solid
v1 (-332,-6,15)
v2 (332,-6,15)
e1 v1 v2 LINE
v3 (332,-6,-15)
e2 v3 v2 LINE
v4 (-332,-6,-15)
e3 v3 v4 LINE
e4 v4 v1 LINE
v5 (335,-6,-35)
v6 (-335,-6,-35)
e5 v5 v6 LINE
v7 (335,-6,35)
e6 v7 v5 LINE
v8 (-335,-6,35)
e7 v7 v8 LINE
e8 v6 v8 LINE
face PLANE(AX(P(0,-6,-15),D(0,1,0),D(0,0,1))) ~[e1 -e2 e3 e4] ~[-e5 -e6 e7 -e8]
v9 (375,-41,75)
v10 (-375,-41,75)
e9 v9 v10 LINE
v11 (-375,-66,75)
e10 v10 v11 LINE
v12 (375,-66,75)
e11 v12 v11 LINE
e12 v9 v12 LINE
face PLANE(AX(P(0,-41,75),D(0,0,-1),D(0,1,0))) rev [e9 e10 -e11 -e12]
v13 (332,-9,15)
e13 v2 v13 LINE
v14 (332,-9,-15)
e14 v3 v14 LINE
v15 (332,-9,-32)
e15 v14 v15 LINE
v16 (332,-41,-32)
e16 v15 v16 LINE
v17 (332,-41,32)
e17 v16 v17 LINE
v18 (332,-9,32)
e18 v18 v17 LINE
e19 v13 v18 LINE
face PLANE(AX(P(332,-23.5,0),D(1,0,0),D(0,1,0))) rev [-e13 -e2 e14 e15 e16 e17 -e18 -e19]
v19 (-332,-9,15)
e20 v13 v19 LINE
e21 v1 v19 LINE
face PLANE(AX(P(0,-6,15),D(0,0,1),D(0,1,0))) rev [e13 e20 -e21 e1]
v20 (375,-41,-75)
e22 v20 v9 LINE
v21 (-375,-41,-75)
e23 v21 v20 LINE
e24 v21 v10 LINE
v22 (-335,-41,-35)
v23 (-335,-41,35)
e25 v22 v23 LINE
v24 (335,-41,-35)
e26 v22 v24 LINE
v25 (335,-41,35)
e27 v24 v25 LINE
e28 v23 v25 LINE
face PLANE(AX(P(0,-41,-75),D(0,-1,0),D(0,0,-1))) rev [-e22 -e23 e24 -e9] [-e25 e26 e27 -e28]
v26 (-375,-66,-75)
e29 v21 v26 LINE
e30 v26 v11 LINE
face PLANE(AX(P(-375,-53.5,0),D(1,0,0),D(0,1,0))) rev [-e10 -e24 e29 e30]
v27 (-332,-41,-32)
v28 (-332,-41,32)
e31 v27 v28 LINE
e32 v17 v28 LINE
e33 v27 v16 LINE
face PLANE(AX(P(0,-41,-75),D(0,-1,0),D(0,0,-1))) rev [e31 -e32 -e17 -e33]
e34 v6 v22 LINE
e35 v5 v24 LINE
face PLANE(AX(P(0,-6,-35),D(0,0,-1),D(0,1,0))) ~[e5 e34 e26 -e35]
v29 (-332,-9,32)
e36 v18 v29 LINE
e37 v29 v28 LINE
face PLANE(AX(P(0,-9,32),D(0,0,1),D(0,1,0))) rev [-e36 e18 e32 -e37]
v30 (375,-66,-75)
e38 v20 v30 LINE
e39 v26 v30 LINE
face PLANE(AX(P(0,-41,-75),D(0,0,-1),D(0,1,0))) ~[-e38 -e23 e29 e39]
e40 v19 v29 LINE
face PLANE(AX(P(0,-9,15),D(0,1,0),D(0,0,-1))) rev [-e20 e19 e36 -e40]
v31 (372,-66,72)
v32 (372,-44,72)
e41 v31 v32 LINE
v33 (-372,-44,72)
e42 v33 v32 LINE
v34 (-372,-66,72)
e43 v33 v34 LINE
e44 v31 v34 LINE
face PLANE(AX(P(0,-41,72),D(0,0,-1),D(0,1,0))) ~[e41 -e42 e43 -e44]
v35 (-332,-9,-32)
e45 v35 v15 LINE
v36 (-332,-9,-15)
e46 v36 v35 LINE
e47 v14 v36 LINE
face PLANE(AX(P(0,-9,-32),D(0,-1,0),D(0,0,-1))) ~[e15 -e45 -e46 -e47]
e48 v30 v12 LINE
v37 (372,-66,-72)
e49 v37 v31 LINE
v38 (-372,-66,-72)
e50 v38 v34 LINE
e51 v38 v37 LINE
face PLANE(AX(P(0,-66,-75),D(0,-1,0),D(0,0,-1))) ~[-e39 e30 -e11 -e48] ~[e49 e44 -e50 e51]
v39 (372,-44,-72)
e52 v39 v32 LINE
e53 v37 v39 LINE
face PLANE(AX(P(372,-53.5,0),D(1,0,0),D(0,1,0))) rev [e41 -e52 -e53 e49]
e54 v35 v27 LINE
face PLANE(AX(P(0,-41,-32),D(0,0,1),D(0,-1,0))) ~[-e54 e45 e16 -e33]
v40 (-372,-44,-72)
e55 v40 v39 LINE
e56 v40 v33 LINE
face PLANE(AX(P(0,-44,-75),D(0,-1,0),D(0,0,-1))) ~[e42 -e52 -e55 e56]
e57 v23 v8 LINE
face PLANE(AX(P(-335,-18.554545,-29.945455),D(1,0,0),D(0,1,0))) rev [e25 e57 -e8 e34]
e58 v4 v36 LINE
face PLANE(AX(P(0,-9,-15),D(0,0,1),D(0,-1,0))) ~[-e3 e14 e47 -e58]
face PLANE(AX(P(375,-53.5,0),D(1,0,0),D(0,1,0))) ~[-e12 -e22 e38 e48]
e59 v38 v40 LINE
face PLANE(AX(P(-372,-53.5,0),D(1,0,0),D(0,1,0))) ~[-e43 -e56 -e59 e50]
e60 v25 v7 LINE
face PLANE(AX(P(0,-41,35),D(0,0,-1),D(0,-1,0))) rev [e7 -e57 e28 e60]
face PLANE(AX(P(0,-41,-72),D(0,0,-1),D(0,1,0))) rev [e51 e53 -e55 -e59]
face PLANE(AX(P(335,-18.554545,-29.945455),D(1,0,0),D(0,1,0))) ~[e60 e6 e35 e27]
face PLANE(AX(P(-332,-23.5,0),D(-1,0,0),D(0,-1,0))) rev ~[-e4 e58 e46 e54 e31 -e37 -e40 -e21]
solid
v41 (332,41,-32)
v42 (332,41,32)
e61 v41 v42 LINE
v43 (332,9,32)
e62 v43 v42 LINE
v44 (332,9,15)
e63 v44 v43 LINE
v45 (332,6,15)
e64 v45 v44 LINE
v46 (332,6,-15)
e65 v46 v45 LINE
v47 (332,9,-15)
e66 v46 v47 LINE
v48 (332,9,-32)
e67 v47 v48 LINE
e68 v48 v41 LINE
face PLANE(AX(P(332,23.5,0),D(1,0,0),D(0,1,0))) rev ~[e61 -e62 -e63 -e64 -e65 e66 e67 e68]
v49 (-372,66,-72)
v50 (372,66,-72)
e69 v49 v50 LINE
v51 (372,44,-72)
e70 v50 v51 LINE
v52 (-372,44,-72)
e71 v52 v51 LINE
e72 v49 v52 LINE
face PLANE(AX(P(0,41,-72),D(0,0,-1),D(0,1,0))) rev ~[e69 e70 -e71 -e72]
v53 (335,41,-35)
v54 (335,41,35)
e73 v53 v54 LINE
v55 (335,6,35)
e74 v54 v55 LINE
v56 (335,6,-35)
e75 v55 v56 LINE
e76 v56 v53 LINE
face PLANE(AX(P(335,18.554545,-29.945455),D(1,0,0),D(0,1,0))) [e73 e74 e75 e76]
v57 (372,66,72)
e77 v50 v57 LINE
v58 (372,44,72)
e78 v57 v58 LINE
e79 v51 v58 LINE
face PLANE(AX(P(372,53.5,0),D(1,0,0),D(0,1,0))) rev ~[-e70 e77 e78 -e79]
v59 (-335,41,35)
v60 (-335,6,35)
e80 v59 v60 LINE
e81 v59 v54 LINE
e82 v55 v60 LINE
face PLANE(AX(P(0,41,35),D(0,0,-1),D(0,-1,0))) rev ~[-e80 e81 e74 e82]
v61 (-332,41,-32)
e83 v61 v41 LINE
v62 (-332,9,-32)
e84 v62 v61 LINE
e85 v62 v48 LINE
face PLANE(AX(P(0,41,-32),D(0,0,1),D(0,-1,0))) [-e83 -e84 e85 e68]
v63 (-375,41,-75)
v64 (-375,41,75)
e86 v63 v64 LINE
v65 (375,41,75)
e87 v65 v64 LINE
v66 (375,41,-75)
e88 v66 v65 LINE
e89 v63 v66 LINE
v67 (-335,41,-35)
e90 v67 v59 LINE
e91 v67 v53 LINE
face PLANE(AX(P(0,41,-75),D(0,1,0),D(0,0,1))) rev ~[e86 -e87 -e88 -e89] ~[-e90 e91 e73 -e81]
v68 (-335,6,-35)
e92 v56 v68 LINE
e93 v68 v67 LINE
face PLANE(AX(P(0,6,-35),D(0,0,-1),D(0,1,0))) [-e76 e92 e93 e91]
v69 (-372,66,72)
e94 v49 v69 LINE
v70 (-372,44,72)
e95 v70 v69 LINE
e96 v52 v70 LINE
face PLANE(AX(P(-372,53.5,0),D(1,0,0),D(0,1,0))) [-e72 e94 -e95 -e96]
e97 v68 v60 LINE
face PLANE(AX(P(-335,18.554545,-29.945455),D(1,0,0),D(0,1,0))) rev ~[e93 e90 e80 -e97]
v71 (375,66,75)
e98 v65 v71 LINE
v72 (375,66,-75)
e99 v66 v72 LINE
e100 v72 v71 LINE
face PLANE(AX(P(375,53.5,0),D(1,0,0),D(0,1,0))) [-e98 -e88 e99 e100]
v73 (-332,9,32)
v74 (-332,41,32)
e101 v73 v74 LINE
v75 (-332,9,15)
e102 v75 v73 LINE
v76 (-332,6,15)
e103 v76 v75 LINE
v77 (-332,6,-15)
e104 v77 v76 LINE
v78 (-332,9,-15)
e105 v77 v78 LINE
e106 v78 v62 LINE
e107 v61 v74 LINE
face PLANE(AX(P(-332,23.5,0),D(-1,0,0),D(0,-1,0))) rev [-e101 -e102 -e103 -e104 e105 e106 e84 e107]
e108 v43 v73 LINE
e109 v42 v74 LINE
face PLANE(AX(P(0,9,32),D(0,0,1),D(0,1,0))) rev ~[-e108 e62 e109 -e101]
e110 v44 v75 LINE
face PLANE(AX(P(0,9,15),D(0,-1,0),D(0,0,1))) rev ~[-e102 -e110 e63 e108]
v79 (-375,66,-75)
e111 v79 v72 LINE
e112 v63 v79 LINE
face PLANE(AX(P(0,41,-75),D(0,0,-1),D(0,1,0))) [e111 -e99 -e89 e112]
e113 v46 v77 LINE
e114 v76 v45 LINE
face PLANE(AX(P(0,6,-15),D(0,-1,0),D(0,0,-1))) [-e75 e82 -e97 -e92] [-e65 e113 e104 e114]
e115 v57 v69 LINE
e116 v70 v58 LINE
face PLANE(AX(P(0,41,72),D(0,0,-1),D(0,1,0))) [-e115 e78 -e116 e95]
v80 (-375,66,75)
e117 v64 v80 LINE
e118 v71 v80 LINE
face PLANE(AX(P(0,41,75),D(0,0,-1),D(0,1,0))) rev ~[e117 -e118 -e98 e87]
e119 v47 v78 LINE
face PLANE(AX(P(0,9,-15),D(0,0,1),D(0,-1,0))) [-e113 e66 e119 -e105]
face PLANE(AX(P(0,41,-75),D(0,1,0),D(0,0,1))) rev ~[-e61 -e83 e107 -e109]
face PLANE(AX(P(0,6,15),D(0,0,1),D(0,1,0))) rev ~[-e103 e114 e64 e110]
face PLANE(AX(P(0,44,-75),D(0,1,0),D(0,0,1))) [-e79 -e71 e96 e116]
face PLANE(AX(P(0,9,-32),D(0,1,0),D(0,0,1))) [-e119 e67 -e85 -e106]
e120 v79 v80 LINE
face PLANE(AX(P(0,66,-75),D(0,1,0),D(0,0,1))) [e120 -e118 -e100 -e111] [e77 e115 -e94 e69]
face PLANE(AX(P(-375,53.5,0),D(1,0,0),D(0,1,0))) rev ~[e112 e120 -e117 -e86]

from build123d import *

# Parameters (mm, degrees)
F0_W     = 25
F0_H     = 150
F1_DEPTH = 375
F2_T     = -3
F4_DEPTH = 335
F5_W     = 35
F5_H     = 70
F6_DEPTH = 3


# Not quite as in the source:
# - a pattern or mirror of a feature is missing from the dataset's text; its kind, count and spacing are read off the source's solid


with BuildPart() as f1:
    # F0 (on Right) → F1 (new body, symmetric)
    with BuildSketch(Plane.YZ):
        with Locations((53.5, 0)):
            Rectangle(F0_W, F0_H)
    extrude(amount=F1_DEPTH, both=True)

    # F2
    f2_openings = [f1.faces().sort_by_distance(p)[0] for p in [
        (0, 66, 0),
    ]]
    offset(amount=F2_T, openings=f2_openings)

    # F3 (on Right) → F4 (join, symmetric)
    with BuildSketch(Plane.YZ):
        Polygon((41, 32), (41, 35), (6, 35), (6, 15), (9, 15), (9, 32), align=None)
        Polygon((6, -35), (41, -35), (41, -32), (9, -32), (9, -15), (6, -15), align=None)
    extrude(amount=F4_DEPTH, both=True)

    # F5 (on face) → F6 (join)
    with BuildSketch(Plane.YZ.offset(335)):
        with Locations((23.5, 0)):
            Rectangle(F5_W, F5_H)
    f6 = extrude(amount=-F6_DEPTH)

    # F6_copies: F6 across plane
    add(f6.mirror(Plane(origin=(0, 0, 0), x_dir=(0, 0, -1), z_dir=(-1, 0, 0))))


with BuildPart() as f7_1:
    # F7: instance of F1
    add(f1.part.mirror(Plane.XZ))


solid = Compound([f1.part, f7_1.part])
